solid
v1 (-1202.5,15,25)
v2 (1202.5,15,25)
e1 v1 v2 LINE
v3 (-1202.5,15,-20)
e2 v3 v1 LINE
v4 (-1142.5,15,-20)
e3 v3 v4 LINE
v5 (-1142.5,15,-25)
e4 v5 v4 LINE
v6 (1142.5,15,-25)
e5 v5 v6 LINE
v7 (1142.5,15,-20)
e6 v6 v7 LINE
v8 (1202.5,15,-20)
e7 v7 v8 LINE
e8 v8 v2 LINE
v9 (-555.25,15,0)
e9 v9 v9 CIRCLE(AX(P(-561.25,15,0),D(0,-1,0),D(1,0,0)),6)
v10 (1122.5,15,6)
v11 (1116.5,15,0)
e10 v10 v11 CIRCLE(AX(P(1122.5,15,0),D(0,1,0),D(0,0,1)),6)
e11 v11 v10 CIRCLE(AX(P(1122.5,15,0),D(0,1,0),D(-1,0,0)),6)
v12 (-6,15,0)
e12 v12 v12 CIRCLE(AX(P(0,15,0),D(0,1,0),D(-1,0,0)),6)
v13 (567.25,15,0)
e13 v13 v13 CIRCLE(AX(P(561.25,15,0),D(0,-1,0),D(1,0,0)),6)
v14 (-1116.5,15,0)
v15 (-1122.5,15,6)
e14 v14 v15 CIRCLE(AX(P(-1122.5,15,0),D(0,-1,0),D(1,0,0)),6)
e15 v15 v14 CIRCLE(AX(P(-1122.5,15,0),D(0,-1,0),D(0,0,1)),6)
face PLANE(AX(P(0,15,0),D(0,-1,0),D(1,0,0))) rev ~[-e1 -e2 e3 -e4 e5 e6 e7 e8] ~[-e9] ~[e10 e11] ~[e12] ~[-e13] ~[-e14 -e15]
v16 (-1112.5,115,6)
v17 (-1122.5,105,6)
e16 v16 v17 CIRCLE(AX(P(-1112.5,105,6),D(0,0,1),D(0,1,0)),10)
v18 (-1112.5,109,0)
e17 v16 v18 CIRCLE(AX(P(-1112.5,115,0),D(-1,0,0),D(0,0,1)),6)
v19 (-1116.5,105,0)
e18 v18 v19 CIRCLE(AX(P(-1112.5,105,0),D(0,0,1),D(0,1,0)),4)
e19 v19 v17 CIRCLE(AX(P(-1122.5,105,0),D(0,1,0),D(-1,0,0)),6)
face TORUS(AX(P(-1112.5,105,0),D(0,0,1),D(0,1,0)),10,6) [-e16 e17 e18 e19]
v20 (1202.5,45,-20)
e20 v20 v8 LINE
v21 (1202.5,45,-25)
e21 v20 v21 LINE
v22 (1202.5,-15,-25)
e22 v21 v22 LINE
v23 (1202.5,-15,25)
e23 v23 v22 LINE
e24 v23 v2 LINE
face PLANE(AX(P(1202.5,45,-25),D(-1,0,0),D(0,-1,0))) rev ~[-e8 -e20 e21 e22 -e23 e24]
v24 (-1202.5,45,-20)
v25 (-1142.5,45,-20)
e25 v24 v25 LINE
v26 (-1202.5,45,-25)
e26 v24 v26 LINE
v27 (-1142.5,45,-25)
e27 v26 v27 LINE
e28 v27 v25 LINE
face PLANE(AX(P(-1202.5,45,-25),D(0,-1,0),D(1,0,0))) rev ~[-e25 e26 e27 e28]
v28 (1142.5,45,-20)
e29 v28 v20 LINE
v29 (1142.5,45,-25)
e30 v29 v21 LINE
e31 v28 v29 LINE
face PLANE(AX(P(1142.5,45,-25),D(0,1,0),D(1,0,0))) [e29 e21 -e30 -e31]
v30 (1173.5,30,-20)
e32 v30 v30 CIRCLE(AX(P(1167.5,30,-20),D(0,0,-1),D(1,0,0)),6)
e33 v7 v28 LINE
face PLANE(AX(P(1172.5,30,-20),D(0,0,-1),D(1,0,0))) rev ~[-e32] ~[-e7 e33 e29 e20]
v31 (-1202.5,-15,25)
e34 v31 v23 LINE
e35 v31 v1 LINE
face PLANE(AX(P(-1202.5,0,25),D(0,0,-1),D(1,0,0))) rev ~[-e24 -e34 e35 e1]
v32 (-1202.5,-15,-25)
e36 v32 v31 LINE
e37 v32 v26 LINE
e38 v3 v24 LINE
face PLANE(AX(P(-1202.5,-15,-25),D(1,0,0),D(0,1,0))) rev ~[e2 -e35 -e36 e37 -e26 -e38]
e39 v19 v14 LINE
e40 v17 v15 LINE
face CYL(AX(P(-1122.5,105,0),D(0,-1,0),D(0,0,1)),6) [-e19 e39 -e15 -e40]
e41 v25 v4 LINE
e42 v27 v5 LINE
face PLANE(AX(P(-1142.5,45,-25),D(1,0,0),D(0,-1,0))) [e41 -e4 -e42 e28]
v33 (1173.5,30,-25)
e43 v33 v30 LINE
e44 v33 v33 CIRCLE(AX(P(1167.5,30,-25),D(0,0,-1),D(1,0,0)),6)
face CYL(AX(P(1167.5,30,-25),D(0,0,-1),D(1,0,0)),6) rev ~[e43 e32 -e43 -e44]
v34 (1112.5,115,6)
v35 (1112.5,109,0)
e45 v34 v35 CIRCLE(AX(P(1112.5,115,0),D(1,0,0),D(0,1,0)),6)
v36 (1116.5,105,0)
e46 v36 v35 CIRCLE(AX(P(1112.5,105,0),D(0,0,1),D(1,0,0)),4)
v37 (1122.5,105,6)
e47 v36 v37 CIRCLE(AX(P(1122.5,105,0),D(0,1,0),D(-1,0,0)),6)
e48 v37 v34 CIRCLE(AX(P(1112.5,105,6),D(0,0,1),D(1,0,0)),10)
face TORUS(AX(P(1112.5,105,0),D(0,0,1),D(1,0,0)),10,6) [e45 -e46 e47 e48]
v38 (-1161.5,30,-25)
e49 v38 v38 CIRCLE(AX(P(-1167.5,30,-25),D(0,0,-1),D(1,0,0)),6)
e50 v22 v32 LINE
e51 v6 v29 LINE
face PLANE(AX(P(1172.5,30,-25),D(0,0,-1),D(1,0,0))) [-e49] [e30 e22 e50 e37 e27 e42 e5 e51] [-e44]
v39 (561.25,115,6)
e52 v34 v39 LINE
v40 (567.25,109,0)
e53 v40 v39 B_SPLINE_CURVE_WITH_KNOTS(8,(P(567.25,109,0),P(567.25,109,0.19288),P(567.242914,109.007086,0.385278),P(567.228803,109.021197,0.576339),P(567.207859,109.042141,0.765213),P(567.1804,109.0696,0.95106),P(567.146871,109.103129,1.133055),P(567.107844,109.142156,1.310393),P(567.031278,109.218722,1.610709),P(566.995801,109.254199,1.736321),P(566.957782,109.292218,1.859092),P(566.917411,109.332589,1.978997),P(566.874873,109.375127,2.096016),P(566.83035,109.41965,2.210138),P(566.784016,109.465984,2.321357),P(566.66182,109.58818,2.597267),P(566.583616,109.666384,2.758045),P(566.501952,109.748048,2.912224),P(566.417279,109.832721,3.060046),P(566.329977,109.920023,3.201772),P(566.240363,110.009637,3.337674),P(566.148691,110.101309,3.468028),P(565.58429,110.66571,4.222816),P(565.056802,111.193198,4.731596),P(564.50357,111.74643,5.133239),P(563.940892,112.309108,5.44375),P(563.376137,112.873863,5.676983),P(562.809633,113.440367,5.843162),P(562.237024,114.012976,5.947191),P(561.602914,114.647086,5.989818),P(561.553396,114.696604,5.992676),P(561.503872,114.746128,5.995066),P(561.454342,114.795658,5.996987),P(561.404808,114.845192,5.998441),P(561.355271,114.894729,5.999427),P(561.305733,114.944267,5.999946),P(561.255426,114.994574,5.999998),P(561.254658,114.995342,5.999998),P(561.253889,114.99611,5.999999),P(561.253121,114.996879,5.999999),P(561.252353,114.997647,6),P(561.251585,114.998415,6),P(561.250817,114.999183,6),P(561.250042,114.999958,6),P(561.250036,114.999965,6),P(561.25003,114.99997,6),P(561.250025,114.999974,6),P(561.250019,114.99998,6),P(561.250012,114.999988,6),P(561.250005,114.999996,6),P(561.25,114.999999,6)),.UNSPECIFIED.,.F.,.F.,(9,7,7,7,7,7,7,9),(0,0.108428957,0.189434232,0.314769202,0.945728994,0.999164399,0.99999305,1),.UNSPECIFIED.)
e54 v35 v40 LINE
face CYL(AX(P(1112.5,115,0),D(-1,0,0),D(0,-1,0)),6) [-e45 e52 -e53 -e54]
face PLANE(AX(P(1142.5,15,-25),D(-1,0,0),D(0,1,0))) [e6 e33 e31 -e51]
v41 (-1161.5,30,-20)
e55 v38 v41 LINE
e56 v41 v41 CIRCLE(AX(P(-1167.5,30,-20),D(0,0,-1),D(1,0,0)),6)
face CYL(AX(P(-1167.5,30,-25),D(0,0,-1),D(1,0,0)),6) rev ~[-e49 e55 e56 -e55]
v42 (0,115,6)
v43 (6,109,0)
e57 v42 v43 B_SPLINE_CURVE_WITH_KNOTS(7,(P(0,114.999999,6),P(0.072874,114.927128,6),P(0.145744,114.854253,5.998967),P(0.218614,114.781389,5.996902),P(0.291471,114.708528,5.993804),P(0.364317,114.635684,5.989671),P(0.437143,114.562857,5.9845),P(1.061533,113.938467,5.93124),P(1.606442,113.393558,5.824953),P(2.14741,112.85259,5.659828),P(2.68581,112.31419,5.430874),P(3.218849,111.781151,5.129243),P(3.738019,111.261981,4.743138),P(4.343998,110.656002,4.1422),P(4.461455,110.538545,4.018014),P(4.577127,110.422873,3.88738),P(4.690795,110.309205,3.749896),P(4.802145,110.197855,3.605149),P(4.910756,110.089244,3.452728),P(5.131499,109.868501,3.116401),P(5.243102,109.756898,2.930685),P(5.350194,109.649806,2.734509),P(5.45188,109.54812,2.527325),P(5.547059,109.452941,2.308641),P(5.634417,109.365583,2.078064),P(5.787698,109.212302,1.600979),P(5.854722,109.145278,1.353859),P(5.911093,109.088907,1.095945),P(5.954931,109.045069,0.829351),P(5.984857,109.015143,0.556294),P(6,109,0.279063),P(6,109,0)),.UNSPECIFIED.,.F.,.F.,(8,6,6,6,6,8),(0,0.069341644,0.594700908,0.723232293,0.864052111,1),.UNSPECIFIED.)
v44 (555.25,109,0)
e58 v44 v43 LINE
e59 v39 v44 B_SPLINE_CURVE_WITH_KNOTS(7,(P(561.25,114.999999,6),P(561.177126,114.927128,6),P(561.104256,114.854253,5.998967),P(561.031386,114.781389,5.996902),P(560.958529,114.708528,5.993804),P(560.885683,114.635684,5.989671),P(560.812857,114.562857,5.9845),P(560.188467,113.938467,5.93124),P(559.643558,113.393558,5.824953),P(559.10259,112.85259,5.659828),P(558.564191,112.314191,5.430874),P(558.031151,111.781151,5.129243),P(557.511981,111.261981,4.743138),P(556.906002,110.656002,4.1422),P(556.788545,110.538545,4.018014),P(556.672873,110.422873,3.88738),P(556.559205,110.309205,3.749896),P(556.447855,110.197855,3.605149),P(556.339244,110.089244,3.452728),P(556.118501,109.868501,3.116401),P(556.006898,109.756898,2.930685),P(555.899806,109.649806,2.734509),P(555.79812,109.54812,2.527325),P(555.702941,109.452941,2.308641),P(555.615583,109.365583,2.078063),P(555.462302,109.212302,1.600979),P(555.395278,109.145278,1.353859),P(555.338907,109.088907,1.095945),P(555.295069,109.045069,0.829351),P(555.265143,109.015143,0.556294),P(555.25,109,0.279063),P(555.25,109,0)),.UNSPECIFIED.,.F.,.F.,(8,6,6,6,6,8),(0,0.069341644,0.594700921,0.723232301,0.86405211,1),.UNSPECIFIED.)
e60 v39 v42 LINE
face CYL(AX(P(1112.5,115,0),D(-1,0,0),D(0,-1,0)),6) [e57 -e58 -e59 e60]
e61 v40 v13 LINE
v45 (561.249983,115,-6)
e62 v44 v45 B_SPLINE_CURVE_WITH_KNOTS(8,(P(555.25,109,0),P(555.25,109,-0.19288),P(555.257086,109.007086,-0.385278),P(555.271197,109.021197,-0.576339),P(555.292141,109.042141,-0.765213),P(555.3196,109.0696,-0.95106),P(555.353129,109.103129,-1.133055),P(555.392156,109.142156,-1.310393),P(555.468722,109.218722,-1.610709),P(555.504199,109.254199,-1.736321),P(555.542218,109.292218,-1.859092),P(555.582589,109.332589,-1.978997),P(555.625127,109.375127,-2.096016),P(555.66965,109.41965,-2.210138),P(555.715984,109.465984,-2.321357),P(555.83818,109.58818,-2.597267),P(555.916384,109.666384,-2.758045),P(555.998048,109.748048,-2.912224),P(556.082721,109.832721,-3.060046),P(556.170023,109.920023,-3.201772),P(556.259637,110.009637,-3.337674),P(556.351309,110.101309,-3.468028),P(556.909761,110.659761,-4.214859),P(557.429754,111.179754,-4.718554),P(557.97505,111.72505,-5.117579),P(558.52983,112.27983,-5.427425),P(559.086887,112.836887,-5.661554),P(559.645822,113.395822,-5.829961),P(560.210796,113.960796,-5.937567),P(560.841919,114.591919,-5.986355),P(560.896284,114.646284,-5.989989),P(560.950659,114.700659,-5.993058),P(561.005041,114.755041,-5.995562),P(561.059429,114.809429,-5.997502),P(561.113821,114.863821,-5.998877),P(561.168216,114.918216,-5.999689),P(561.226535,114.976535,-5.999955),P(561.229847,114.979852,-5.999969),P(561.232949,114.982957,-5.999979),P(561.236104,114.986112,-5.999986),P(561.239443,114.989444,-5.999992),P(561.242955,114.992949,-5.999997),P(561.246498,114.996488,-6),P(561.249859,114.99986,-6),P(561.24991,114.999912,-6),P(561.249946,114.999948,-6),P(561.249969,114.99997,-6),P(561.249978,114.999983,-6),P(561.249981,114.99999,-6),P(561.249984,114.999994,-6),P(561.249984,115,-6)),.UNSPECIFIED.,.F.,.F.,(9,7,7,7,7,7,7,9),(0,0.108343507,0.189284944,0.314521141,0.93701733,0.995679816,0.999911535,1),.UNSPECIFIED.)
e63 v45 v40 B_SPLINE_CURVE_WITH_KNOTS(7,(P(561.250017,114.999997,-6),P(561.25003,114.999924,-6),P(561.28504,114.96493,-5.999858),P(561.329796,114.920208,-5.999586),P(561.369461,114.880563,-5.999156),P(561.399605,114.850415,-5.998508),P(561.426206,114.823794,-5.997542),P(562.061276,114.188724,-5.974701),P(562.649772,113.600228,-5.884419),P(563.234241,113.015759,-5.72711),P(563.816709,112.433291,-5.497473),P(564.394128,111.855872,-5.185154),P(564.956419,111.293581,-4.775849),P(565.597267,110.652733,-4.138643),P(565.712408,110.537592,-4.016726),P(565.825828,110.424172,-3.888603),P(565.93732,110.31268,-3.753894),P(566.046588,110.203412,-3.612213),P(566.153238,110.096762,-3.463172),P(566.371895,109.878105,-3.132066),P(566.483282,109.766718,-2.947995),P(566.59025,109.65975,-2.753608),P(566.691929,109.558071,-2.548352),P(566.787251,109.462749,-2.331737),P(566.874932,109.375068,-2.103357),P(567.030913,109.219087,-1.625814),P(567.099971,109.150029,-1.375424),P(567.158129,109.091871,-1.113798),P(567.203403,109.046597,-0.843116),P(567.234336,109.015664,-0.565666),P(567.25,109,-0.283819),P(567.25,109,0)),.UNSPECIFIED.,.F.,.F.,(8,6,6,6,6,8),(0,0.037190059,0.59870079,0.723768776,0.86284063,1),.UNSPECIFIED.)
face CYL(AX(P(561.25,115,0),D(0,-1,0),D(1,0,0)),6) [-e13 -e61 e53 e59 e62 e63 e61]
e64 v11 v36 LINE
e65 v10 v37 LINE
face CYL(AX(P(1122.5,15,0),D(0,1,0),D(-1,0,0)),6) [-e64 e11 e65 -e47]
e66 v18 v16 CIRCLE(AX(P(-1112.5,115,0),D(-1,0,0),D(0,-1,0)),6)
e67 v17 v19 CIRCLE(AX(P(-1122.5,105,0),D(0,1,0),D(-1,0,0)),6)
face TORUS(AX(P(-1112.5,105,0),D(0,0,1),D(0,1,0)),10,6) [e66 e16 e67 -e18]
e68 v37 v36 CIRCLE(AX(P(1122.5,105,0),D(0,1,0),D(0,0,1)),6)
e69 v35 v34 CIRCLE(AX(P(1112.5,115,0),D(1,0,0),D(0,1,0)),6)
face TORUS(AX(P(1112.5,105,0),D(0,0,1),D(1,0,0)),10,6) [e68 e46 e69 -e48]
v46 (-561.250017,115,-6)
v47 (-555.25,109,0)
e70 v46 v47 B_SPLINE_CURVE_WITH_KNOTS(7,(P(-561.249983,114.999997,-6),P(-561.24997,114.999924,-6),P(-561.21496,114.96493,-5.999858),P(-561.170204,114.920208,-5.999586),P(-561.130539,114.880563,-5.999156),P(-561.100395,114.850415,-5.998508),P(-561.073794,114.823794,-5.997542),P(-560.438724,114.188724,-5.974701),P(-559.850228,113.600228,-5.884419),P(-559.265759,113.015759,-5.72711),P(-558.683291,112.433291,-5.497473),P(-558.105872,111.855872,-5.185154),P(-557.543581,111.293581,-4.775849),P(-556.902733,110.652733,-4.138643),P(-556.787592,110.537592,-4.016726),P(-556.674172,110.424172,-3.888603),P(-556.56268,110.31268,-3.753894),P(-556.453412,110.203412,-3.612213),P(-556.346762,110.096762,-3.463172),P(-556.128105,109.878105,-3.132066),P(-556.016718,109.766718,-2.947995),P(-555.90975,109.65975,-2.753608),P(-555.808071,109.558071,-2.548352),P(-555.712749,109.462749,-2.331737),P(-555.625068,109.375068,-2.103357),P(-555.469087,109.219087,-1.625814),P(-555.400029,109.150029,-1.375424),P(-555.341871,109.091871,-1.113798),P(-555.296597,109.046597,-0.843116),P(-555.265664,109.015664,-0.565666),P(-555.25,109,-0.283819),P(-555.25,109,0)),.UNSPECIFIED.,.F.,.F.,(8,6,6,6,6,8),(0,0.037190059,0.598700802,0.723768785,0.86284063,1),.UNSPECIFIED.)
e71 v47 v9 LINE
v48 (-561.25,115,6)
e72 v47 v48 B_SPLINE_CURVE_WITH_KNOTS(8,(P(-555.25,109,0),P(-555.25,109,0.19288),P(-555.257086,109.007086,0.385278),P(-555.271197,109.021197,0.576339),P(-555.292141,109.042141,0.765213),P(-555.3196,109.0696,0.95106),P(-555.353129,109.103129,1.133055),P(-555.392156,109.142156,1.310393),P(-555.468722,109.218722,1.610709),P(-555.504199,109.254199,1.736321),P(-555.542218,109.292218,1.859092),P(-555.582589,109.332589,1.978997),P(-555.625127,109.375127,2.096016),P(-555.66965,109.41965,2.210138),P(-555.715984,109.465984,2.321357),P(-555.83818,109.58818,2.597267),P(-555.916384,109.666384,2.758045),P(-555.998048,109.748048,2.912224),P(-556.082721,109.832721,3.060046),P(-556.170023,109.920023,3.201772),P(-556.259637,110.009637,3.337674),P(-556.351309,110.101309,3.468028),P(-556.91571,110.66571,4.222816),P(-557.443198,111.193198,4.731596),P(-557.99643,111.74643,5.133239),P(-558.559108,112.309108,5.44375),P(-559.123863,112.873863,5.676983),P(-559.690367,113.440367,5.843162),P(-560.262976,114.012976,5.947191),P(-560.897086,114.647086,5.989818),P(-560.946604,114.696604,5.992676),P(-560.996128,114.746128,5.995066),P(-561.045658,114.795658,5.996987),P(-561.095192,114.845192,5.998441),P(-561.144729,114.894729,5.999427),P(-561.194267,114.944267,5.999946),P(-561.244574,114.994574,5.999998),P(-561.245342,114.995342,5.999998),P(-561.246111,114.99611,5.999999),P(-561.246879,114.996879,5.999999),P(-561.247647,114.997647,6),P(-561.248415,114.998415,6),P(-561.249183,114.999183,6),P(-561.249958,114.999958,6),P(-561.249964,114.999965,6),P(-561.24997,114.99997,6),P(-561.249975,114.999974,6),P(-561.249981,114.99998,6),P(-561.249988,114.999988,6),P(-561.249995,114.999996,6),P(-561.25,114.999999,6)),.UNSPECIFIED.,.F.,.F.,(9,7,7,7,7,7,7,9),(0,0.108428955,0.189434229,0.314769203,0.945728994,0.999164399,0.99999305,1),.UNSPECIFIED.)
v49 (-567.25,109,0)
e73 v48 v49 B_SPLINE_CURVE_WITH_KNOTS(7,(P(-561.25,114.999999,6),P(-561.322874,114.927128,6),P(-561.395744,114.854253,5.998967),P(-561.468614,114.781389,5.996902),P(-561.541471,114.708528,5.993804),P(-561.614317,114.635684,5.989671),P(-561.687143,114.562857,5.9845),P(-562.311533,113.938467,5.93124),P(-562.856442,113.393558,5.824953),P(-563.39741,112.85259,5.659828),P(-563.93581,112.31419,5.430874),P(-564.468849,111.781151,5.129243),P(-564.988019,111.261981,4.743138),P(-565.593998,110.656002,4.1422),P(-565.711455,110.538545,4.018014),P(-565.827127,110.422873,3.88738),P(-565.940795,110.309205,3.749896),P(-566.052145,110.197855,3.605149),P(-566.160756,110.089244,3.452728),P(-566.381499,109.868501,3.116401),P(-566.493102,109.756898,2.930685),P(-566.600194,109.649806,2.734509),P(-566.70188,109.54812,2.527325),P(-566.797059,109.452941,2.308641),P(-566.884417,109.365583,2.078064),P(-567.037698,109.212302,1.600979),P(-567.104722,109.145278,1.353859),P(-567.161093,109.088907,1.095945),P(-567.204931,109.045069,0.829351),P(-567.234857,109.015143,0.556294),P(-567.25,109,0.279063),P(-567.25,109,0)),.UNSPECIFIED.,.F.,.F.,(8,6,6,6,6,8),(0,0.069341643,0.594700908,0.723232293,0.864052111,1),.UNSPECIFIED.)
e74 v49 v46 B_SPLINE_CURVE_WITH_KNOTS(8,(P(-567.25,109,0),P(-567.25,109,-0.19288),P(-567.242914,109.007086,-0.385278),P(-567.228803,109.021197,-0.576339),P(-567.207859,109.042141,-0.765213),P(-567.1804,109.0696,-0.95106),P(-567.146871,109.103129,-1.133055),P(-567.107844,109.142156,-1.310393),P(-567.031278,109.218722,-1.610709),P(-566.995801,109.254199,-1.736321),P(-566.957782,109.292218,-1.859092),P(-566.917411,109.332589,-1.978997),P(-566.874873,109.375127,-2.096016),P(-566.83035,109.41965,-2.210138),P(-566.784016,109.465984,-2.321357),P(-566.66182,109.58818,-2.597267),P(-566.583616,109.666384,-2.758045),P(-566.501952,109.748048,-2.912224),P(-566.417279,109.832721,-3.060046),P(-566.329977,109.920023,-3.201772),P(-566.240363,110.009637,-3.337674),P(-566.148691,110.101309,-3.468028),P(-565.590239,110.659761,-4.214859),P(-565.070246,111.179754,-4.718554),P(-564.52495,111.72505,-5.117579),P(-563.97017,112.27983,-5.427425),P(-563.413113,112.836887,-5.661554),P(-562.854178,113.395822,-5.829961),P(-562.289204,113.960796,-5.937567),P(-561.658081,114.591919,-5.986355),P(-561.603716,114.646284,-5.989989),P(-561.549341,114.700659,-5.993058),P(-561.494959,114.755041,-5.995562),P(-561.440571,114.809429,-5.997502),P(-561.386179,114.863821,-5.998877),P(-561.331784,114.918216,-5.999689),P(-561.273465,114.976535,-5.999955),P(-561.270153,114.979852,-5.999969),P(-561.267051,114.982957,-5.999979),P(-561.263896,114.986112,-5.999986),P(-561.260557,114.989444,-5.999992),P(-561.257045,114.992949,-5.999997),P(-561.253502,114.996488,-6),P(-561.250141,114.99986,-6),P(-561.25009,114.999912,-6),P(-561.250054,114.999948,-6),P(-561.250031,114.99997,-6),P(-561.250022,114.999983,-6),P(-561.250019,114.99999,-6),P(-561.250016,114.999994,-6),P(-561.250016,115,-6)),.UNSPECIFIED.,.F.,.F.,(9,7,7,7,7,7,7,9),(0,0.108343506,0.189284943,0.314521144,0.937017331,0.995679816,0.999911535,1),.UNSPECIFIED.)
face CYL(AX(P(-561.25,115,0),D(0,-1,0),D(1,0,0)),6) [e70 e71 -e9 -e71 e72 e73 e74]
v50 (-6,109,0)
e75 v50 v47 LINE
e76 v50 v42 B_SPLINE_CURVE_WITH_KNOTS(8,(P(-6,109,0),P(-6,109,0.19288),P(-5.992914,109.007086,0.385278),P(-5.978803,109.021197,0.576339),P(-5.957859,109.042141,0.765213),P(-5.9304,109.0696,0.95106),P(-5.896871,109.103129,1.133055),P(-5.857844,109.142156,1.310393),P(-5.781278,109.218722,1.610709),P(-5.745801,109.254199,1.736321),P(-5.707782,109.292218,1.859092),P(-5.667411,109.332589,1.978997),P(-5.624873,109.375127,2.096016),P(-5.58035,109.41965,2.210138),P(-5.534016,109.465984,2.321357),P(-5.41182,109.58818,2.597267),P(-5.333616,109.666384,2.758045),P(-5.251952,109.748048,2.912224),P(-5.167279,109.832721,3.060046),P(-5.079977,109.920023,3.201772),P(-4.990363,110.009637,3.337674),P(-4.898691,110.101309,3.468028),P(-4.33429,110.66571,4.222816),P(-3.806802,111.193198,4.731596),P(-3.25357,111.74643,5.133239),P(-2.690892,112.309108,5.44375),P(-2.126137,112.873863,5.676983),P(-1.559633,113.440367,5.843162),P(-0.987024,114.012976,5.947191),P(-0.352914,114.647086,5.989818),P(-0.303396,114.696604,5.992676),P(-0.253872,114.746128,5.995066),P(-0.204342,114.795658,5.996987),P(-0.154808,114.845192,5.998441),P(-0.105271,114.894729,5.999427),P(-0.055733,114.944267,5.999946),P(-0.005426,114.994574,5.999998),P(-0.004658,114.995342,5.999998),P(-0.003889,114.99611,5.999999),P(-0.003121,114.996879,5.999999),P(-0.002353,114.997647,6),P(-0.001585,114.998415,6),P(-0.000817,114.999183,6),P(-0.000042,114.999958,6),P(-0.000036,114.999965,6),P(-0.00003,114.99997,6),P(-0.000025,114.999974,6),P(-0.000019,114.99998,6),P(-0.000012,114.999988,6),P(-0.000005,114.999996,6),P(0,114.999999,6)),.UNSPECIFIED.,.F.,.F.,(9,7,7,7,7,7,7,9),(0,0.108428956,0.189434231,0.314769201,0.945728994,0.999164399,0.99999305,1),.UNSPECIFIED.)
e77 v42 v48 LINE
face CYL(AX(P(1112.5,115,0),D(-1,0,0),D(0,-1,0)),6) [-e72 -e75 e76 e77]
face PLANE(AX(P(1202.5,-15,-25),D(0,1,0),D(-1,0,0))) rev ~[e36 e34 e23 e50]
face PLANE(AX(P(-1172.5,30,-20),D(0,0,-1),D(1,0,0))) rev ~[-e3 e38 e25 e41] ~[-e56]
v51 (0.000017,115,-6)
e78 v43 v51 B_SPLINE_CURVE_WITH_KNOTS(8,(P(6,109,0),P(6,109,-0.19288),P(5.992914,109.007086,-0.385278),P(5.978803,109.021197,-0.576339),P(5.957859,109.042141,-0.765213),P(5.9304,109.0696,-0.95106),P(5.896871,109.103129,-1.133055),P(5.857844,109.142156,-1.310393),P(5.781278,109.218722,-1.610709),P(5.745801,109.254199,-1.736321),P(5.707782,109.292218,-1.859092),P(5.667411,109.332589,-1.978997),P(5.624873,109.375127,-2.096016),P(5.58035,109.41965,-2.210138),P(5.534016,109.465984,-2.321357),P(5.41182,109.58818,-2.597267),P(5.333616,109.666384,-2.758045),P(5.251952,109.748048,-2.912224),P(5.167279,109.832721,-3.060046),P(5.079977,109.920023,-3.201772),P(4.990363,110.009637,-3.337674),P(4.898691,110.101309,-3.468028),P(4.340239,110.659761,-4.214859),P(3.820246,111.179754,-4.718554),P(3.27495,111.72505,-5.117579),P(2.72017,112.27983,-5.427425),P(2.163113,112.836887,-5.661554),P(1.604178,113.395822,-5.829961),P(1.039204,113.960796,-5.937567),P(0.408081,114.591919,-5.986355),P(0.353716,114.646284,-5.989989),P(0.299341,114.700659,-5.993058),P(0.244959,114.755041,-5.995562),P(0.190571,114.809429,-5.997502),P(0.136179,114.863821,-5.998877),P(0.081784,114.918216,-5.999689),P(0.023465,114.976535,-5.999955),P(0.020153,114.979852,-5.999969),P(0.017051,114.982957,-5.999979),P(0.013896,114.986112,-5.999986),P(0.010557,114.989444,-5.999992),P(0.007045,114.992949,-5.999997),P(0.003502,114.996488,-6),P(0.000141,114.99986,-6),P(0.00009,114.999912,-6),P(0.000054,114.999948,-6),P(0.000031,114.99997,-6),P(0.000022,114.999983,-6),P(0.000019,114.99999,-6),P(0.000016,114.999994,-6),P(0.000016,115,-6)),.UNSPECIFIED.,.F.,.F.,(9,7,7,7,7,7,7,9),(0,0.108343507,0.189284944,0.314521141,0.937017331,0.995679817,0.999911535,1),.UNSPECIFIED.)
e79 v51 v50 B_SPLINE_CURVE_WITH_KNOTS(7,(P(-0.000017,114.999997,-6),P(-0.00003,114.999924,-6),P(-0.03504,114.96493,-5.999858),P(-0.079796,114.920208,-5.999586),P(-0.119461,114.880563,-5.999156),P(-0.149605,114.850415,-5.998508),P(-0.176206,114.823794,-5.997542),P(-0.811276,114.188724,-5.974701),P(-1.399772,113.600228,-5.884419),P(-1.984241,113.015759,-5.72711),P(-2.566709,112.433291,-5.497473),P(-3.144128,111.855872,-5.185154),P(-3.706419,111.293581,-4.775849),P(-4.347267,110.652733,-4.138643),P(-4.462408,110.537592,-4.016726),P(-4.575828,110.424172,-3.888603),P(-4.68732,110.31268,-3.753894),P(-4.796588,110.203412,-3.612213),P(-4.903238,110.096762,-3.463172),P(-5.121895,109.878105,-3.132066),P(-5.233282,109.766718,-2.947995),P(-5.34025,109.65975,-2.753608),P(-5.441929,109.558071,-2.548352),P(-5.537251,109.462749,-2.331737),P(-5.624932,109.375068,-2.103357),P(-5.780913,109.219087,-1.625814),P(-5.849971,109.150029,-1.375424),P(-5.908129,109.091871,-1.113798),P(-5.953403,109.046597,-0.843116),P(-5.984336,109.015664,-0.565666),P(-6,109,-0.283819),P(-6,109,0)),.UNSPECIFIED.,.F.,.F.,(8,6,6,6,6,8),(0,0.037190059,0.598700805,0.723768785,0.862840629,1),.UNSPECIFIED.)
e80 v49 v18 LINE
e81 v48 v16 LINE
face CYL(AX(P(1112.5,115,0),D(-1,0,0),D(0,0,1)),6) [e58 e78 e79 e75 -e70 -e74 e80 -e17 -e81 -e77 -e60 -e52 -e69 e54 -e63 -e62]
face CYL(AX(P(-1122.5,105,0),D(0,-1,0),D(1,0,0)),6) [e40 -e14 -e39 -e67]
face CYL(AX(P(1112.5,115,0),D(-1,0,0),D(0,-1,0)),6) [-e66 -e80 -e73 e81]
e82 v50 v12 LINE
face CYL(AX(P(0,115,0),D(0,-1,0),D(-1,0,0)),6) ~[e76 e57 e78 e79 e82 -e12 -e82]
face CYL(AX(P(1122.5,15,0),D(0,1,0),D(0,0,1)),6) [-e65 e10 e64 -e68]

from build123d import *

# Parameters (mm, degrees)
F0_W          = 2405
F0_H          = 50
F1_DEPTH      = 15
F1_DEPTH_BACK = 15
F2_W          = 60
F2_H          = 30
F3_DEPTH      = 5
F4_W          = 60
F4_H          = 30
F5_DEPTH      = 5
F6_R          = 6
F7_DEPTH      = 5
F9_DEPTH      = 5
F10_DEPTH     = 5
F11_DEPTH     = 5


# Not quite as in the source:
# - a feature of the source that left no trace in its solid (it failed there, or was rolled back) is left out
# - a pattern or mirror of a feature is missing from the dataset's text; its kind, count and spacing are read off the source's solid
# - a feature names something its author has since deleted; it is built from what else it names


with BuildPart() as f1:
    # F0 (on Front) → F1 (new body, two sides)
    with BuildSketch(Plane.XZ) as f1_sk:
        Rectangle(F0_W, F0_H)
    extrude(amount=F1_DEPTH)
    extrude(f1_sk.sketch, amount=-F1_DEPTH_BACK)

    # F2 (on face) → F3 (join)
    with BuildSketch(Plane(origin=(0, 0, -25), x_dir=(1, 0, 0), z_dir=(0, 0, -1))):
        with Locations((-1172.5, -30)):
            Rectangle(F2_W, F2_H)
        Polygon((-1142.5, 15), (-1202.5, 15), (-1202.5, 0), (-1202.5, -15), (-1142.5, -15), align=None)
    extrude(amount=F3_DEPTH)

    # F4 (on face) → F5 (join)
    with BuildSketch(Plane(origin=(0, 0, -25), x_dir=(1, 0, 0), z_dir=(0, 0, -1))):
        with Locations((1172.5, -30)):
            Rectangle(F4_W, F4_H)
        Polygon((1202.5, 0), (1202.5, 15), (1142.5, 15), (1142.5, -15), (1202.5, -15), align=None)
    extrude(amount=F5_DEPTH)

    # F6 (on face) → F7 (cut, through all)
    with BuildSketch(Plane(origin=(0, 0, -30), x_dir=(1, 0, 0), z_dir=(0, 0, -1))):
        with Locations((1167.5, -30)):
            Circle(F6_R)
    extrude(amount=-F7_DEPTH, mode=Mode.SUBTRACT)

    # F8 (on face) → F9 (cut, through all)
    with BuildSketch(Plane(origin=(0, 0, -30), x_dir=(1, 0, 0), z_dir=(0, 0, -1))):
        with BuildLine():
            ThreePointArc((-1173.5, -30), (-1167.5, -36), (-1161.5, -30))
            ThreePointArc((-1161.5, -30), (-1167.5, -24), (-1173.5, -30))
        make_face()
    extrude(amount=-F9_DEPTH, mode=Mode.SUBTRACT)

    # F10 (add): faces of the model
    f10_faces = [f1.faces().sort_by_distance(p)[0] for p in [
        (1172.5, 44.3291796068, -25),
        (-1201.8291796068, 30, -25),
    ]]
    extrude(f10_faces, amount=F10_DEPTH)

    # F11 (cut): faces of the model
    f11_faces = [f1.faces().sort_by_distance(p)[0] for p in [
        (-1172.6621744947, 14.5134765159, -30),
        (1172.6621744947, 14.5134765159, -30),
    ]]
    extrude(f11_faces, amount=-F11_DEPTH, mode=Mode.SUBTRACT)

    # F14: sweep along a path in F13
    with BuildLine(Plane.XY) as f14_path:
        Line((1122.5, 15), (1122.5, 105))
        ThreePointArc((1122.5, 105), (1119.5710678119, 112.0710678119), (1112.5, 115))
        Line((1112.5, 115), (-1112.5, 115))
        ThreePointArc((-1112.5, 115), (-1119.5710678119, 112.0710678119), (-1122.5, 105))
        Line((-1122.5, 105), (-1122.5, 15))
    # F12 (on face) → F14 (sweep)
    with BuildSketch(Plane(origin=(0, 15, 0), x_dir=(-1, 0, 0), z_dir=(0, 1, 0))):
        with BuildLine():
            Line((-1122.5, 0), (-1122.5, 6))
            ThreePointArc((-1122.5, 6), (-1126.7426406871, -4.2426406871), (-1116.5, 0))
            Line((-1116.5, 0), (-1122.5, 0))
        make_face()
        with BuildLine():
            ThreePointArc((-1116.5, 0), (-1118.2573593129, 4.2426406871), (-1122.5, 6))
            Line((-1122.5, 6), (-1122.5, 0))
            Line((-1122.5, 0), (-1116.5, 0))
        make_face()
    sweep(path=f14_path.line)

    # F15: sweep along a path in F13
    with BuildLine(Plane.XY) as f15_path:
        Line((-561.25, 115), (-561.25, 15))
    # F12 (on face) → F15 (sweep)
    with BuildSketch(Plane(origin=(0, 15, 0), x_dir=(-1, 0, 0), z_dir=(0, 1, 0))):
        with BuildLine():
            ThreePointArc((567.25, 0), (561.25, 6), (555.25, 0))
            Line((555.25, 0), (567.25, 0))
        make_face()
        with BuildLine():
            Line((567.25, 0), (555.25, 0))
            ThreePointArc((555.25, 0), (561.25, -6), (567.25, 0))
        make_face()
    f15 = sweep(path=f15_path.line)

    # F15_copies: F15 across plane
    add(f15.mirror(Plane(origin=(-280.625, 0, 0), x_dir=(0, 0, 1), z_dir=(1, 0, 0))))

    # F17: sweep along a path in F13
    with BuildLine(Plane.XY) as f17_path:
        Line((561.25, 115), (561.25, 15))
    # F12 (on face) → F17 (sweep)
    with BuildSketch(Plane(origin=(0, 15, 0), x_dir=(-1, 0, 0), z_dir=(0, 1, 0))):
        with BuildLine():
            ThreePointArc((-555.25, 0), (-561.25, 6), (-567.25, 0))
            Line((-567.25, 0), (-555.25, 0))
        make_face()
        with BuildLine():
            Line((-555.25, 0), (-567.25, 0))
            ThreePointArc((-567.25, 0), (-561.25, -6), (-555.25, 0))
        make_face()
    sweep(path=f17_path.line)


solid = f1.part
